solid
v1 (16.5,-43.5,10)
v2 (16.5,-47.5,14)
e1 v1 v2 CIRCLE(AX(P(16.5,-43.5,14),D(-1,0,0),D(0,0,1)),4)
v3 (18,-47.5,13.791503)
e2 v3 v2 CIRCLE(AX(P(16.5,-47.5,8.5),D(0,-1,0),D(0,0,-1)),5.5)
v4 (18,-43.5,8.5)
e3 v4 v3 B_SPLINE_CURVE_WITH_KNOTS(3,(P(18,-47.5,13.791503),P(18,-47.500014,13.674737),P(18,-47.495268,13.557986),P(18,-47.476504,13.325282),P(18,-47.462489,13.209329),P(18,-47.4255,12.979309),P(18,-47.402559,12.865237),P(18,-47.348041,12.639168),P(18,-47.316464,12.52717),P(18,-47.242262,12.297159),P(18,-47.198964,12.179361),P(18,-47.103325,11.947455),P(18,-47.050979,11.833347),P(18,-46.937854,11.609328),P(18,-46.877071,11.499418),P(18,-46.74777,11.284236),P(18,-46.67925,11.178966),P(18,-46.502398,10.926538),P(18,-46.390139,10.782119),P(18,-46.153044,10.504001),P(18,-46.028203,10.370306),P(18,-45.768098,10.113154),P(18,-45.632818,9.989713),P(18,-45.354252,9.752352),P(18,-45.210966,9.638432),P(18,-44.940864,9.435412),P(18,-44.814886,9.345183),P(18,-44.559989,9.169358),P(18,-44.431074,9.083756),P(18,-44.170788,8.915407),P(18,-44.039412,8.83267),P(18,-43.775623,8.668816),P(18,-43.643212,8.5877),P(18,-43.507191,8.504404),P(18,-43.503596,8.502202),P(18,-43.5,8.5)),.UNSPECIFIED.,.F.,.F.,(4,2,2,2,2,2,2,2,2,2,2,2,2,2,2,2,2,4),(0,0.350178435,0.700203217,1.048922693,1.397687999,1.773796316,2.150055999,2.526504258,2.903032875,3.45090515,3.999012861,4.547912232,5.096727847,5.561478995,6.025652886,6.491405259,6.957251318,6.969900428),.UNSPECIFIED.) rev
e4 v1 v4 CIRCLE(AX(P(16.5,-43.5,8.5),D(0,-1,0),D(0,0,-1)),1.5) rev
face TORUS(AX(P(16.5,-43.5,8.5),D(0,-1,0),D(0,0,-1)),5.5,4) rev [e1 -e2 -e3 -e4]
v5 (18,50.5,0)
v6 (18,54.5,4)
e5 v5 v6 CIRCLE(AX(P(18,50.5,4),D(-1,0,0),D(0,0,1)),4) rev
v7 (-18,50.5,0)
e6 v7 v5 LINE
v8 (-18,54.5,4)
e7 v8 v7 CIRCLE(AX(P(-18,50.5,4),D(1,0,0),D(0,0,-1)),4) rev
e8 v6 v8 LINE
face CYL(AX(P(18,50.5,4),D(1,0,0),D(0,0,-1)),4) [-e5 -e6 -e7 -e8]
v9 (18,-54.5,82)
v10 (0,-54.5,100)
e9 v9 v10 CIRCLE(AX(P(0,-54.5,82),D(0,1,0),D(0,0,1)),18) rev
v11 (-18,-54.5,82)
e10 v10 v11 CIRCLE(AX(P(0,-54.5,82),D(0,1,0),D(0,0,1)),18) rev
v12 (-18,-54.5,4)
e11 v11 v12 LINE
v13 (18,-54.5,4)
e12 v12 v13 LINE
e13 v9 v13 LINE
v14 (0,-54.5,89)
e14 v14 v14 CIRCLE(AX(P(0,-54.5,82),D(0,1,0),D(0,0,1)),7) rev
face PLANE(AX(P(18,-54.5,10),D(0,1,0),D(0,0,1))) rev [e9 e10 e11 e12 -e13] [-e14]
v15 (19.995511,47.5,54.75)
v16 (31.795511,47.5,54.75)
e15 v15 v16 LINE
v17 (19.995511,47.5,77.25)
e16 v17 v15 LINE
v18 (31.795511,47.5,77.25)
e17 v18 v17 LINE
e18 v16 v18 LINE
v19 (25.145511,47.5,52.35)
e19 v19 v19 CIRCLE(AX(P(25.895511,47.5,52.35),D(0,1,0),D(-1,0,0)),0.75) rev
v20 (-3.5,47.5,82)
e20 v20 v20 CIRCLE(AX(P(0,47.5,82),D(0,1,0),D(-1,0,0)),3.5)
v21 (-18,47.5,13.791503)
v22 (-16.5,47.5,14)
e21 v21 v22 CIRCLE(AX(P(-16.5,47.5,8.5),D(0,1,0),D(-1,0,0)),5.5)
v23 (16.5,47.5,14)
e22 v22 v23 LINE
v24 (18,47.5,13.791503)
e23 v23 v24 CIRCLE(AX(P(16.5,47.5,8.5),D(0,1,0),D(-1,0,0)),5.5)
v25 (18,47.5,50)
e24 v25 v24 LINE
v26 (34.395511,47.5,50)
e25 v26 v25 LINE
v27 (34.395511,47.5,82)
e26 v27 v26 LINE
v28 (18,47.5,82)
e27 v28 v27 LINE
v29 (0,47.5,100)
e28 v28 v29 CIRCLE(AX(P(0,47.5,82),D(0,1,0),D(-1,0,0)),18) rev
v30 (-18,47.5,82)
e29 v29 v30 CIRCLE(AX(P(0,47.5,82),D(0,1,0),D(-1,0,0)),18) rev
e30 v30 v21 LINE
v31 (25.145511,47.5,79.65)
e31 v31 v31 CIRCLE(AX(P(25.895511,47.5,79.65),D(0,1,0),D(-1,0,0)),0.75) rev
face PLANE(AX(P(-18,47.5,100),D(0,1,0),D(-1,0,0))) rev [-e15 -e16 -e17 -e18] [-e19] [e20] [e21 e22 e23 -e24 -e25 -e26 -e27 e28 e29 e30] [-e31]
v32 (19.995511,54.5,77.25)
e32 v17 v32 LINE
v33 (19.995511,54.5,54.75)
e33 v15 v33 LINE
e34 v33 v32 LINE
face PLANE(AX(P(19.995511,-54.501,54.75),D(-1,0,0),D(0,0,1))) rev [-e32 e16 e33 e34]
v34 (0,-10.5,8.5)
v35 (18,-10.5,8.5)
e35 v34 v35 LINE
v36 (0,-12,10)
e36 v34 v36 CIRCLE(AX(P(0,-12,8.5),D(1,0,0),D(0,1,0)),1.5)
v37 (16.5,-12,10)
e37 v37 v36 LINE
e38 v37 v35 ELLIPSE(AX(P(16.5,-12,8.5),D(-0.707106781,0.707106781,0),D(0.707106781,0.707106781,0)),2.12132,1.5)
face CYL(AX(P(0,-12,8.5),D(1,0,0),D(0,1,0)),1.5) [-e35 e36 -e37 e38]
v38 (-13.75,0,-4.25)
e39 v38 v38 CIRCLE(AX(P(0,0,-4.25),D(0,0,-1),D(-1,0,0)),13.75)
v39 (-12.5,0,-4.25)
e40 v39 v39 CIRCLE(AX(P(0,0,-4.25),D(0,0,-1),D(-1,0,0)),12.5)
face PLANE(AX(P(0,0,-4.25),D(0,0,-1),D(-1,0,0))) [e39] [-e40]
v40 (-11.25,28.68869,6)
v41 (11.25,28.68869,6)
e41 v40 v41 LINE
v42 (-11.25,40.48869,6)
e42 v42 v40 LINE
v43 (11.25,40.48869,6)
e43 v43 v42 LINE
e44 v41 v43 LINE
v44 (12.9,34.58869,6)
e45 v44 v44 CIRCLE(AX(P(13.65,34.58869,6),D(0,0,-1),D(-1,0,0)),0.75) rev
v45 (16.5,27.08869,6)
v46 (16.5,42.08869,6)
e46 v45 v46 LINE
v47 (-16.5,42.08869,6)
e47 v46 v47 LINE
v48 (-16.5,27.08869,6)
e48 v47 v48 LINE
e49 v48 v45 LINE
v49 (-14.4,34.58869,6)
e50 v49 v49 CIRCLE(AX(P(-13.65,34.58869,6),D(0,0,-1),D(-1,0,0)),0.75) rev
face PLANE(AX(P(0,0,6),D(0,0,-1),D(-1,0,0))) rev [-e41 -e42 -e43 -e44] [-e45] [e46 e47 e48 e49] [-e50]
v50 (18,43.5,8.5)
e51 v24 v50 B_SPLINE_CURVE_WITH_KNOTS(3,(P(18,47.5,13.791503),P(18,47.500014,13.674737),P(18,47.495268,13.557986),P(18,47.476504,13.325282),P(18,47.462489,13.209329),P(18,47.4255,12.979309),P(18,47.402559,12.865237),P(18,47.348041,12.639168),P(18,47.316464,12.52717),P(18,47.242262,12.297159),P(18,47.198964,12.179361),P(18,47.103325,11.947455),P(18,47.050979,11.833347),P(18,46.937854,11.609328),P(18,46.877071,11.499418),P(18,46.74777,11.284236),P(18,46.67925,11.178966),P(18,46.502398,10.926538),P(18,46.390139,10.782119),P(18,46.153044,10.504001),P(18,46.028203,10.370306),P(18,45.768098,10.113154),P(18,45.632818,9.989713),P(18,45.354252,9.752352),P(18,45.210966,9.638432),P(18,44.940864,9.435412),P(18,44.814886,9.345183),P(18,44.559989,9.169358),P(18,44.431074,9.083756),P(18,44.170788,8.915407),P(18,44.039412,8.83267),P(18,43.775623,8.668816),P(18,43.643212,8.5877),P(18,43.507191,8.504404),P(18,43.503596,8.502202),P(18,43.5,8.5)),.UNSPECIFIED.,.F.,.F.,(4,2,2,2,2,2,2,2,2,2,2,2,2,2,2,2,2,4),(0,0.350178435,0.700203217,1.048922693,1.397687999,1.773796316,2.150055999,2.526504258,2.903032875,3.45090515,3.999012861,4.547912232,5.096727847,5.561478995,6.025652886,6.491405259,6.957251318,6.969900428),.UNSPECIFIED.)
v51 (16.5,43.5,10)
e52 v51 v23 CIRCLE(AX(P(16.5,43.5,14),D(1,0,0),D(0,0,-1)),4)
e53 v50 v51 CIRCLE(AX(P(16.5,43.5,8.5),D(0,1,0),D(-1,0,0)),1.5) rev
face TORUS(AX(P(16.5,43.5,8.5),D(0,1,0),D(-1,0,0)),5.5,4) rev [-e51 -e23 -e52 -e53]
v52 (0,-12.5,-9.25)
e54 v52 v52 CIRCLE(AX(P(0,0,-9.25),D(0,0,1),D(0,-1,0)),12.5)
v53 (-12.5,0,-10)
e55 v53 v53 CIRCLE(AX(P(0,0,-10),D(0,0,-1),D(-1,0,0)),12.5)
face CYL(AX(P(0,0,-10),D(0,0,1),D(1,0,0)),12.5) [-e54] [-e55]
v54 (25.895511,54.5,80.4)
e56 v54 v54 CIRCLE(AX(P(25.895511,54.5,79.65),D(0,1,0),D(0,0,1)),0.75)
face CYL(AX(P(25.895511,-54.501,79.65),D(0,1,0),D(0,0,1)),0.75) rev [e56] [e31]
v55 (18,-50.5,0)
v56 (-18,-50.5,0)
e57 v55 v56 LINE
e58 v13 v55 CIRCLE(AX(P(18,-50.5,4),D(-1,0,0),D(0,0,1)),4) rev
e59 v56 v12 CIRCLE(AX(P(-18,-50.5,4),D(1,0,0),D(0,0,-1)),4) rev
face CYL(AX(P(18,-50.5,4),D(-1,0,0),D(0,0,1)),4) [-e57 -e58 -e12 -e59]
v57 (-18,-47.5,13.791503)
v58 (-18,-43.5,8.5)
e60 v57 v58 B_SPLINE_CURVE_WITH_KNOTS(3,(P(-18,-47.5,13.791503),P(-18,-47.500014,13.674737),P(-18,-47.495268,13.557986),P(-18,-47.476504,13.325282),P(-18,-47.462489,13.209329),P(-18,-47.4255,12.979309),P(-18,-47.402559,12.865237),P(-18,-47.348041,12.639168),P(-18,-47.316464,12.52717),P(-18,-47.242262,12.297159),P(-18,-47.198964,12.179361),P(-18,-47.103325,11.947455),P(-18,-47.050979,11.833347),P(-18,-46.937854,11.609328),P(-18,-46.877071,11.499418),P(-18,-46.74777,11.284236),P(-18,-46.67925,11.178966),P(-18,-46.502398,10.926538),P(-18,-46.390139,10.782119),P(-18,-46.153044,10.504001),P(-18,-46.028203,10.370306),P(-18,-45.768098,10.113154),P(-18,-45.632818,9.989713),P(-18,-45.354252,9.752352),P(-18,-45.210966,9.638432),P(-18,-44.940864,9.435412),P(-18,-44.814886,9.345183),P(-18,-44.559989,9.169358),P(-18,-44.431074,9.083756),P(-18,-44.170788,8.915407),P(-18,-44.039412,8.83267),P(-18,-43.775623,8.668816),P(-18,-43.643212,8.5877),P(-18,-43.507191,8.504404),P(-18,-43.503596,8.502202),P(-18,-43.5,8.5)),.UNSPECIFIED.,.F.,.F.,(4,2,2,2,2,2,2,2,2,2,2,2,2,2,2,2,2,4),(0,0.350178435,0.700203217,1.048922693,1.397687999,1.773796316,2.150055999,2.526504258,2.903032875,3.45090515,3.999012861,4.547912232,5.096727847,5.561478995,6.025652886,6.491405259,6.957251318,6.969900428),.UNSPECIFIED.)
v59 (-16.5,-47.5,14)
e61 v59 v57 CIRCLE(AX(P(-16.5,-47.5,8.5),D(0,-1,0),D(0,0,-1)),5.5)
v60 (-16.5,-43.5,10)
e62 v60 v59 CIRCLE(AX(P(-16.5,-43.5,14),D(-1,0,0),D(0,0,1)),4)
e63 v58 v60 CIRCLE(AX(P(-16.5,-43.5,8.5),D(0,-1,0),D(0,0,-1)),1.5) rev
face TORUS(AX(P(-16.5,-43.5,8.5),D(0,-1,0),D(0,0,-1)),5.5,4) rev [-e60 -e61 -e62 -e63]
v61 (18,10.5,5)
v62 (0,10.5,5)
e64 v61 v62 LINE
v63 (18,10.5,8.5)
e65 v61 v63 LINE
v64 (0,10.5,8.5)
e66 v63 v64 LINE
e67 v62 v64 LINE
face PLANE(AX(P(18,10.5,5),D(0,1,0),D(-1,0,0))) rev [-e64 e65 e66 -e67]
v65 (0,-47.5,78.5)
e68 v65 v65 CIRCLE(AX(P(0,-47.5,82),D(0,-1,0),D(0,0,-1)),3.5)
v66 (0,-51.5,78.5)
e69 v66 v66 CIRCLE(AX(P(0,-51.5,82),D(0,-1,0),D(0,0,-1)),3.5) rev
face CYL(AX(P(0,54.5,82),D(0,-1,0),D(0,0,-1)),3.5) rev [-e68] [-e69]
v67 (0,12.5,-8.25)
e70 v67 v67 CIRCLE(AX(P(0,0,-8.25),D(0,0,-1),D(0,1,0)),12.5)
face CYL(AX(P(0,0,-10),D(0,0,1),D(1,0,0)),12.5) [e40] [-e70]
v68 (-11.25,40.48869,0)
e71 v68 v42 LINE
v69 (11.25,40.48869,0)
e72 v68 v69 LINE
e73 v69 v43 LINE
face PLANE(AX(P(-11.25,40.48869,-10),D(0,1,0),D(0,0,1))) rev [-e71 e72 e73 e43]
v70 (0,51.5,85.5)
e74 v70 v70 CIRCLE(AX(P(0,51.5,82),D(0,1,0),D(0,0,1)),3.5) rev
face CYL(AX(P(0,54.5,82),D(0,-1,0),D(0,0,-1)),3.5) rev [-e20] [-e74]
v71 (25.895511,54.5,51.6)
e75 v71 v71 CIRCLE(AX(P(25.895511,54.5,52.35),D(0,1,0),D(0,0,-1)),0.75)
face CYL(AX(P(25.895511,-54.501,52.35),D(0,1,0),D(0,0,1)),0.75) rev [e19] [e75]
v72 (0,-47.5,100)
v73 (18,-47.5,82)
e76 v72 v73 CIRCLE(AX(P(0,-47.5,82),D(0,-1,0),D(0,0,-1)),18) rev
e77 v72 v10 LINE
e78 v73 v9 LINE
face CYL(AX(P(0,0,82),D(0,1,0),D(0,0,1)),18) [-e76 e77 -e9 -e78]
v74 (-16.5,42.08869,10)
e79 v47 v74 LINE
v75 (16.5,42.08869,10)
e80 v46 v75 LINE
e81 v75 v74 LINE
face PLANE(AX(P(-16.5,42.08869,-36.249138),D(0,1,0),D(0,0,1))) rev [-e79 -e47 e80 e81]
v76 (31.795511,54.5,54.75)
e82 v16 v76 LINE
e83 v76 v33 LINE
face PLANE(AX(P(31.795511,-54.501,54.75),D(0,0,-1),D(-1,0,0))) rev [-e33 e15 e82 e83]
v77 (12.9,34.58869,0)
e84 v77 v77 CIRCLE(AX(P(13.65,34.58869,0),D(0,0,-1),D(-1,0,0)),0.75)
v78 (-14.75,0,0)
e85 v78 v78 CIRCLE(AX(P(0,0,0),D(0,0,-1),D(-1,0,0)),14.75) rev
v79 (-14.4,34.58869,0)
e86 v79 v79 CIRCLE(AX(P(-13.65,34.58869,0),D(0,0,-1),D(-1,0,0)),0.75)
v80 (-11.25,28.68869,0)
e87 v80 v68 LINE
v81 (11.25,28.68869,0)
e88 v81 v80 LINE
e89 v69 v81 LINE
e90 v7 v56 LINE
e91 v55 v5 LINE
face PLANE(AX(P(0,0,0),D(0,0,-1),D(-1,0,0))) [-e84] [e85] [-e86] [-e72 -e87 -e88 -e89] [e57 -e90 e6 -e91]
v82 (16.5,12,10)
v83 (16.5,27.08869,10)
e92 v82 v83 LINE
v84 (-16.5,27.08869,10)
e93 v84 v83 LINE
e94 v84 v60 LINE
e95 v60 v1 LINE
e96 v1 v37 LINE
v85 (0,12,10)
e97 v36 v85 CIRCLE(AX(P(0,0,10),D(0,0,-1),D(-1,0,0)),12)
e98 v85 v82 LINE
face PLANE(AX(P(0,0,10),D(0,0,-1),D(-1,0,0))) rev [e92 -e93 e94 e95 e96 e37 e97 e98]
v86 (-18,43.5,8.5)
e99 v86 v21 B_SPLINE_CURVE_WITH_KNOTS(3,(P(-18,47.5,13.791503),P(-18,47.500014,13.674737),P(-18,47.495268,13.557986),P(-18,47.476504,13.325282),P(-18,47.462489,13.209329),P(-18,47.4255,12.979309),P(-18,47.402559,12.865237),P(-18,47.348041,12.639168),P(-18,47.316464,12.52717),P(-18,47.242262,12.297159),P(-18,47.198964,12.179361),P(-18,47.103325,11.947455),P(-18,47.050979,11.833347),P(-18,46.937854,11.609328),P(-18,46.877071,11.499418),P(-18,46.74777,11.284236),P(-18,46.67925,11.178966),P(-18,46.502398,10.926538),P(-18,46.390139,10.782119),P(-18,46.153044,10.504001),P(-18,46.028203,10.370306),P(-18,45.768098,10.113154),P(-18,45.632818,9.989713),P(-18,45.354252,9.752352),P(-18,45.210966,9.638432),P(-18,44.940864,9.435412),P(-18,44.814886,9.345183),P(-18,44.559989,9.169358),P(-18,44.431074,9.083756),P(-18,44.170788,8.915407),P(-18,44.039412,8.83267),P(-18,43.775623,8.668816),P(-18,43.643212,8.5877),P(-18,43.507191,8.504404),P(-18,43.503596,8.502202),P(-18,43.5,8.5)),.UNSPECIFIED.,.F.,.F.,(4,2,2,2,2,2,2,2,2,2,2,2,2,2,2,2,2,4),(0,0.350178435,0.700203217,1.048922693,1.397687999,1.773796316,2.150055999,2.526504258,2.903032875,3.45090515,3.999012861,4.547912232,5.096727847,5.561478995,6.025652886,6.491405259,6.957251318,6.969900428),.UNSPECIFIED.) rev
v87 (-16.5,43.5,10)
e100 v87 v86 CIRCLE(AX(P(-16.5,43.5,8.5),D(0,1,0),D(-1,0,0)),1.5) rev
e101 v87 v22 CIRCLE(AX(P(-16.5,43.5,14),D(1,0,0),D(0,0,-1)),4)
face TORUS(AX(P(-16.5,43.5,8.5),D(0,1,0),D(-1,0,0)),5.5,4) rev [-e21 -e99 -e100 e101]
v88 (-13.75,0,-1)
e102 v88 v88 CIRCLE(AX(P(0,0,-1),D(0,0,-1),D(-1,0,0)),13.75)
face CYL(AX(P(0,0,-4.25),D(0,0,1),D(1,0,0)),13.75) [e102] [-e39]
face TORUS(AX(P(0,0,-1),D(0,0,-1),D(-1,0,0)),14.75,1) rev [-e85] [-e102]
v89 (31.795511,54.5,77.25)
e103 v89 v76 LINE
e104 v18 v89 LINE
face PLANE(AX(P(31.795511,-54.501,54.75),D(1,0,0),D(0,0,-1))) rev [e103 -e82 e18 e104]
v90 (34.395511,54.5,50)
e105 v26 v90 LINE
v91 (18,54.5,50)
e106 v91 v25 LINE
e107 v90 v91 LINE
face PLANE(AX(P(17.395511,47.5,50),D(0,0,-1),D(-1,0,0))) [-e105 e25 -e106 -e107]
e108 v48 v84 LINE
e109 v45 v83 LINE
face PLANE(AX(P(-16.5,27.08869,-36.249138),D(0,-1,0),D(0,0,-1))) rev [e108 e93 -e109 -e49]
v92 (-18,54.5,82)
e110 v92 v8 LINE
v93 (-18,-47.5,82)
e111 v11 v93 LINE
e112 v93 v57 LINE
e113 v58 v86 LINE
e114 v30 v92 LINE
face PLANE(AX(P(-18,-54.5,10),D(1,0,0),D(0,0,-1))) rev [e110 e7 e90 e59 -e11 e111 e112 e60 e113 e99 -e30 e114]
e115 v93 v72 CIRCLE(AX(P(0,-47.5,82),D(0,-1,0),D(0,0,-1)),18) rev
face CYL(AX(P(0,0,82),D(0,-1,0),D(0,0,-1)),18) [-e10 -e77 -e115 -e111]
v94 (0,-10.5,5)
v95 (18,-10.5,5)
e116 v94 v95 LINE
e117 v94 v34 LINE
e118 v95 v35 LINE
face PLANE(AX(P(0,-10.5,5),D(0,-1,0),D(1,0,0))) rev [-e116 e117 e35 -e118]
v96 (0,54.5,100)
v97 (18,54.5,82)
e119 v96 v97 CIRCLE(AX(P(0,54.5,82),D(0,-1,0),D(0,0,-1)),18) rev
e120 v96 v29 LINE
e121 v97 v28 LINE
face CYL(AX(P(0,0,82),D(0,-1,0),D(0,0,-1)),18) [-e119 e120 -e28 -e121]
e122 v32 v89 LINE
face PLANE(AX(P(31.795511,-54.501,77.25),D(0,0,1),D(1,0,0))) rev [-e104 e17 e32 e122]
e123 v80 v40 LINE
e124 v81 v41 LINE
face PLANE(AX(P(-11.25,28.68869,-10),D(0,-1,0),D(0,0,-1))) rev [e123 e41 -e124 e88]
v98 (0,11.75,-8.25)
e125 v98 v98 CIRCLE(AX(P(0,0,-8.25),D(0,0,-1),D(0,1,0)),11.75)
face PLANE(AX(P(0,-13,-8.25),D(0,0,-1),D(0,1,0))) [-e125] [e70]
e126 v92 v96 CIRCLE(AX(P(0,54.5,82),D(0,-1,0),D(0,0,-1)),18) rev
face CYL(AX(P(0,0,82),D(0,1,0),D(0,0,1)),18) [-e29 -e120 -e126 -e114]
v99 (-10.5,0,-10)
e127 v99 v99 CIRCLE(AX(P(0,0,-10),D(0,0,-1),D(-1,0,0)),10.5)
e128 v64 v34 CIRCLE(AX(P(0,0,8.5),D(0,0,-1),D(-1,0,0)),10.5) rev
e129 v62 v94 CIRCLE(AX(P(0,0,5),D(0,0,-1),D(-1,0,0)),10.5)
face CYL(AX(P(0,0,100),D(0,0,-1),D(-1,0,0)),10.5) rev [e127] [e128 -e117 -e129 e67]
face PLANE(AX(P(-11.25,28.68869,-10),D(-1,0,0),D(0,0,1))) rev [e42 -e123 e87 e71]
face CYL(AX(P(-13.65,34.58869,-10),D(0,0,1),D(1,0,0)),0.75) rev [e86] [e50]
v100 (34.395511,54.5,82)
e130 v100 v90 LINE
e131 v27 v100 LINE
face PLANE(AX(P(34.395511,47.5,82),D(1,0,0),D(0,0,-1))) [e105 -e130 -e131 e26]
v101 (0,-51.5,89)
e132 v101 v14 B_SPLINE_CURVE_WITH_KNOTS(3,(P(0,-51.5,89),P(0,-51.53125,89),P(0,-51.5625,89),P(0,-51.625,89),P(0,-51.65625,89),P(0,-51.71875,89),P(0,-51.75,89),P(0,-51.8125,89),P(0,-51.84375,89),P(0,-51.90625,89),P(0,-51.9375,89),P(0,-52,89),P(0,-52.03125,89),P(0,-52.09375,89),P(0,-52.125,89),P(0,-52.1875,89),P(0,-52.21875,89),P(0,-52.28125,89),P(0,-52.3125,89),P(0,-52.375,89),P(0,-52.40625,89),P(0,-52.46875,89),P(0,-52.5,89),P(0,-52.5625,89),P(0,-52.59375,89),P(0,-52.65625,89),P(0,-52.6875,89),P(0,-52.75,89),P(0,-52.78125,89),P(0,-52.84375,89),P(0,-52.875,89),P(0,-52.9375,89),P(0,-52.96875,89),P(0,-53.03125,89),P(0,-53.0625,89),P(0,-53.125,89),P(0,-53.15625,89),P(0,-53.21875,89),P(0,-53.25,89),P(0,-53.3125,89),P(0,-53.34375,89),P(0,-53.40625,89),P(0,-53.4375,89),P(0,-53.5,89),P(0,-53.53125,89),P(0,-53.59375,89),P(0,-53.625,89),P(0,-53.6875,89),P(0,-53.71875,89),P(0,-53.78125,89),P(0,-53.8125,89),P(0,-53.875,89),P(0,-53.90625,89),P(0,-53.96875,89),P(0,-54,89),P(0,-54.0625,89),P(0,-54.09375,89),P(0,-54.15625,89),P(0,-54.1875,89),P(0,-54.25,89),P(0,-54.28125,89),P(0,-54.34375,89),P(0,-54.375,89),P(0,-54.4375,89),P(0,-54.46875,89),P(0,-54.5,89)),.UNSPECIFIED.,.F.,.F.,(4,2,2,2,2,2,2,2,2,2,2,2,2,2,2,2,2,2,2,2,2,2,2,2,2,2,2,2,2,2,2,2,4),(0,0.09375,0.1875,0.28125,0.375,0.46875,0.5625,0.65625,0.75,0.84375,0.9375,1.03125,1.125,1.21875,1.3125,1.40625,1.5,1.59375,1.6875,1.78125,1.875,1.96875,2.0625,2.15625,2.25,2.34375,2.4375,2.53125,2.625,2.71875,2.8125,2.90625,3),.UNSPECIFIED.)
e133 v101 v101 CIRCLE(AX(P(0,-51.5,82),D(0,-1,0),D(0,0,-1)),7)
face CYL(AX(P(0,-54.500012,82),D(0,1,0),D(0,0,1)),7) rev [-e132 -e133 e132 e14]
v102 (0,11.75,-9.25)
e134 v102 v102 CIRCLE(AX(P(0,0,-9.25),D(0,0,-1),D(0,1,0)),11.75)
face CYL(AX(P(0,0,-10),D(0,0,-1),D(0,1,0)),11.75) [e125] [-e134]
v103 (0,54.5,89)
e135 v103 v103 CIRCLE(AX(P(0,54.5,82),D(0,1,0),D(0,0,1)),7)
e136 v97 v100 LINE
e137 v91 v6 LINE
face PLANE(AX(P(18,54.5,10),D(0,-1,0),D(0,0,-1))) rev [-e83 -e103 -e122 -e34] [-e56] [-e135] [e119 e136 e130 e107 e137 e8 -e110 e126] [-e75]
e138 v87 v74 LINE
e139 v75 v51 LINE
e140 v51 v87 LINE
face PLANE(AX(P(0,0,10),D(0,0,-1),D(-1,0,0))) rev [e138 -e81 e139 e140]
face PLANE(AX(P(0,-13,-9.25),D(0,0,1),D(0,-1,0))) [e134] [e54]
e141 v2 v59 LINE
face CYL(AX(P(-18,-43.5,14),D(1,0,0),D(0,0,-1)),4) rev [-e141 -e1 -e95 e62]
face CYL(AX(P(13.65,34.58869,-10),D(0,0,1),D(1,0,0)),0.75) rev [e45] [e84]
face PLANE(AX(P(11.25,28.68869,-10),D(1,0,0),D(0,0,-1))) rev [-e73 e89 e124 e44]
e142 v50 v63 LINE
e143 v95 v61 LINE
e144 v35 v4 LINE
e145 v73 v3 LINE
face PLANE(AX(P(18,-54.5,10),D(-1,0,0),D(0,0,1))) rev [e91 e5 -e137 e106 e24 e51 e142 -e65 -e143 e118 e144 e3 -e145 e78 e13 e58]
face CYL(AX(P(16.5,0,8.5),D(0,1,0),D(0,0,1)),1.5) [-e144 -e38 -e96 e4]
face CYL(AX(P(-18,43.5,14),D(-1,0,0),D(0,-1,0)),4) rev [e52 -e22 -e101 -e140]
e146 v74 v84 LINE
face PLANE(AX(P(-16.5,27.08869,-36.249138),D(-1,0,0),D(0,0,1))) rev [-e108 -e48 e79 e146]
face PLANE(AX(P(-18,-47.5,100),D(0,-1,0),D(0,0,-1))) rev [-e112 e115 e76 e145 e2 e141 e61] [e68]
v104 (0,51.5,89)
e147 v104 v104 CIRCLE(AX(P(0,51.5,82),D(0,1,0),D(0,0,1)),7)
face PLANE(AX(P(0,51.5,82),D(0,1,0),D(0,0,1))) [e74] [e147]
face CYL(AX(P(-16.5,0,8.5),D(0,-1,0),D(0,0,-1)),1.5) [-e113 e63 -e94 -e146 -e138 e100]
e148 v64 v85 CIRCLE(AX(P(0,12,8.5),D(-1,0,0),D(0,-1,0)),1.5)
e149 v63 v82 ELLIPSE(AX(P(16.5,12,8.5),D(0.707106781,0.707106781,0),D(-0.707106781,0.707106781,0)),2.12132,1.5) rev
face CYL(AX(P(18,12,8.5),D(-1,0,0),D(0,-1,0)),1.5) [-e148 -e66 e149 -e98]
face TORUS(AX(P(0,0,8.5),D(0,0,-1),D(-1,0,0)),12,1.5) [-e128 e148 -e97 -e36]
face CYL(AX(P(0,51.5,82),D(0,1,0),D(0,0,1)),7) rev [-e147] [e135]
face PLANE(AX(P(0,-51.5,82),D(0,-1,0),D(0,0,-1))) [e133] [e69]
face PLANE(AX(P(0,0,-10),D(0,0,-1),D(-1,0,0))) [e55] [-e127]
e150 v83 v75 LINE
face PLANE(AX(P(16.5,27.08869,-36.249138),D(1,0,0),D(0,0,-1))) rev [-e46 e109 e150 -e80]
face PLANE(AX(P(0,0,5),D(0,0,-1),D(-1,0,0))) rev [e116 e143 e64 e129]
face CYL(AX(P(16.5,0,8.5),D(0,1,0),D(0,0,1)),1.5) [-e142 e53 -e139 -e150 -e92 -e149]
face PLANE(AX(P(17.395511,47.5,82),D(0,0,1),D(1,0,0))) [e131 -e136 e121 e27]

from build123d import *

# Parameters (mm, degrees)
SKETCH1_W               = 109
SKETCH1_H               = 36
BOSS_EXTRUDE1_DEPTH     = 10
SKETCH2_W               = 36
SKETCH2_H               = 7
BOSS_EXTRUDE2_DEPTH     = 90
CUT_EXTRUDE1_DEPTH      = 150.013422214
CUT_EXTRUDE1_DEPTH_BACK = 150.013422214
SKETCH3_R               = 3.5
CUT_EXTRUDE2_DEPTH      = 150.013422214
CUT_EXTRUDE2_DEPTH_BACK = 3
SKETCH4_R               = 7
CUT_EXTRUDE3_START      = -3
SKETCH5_R               = 7
CUT_EXTRUDE3_DEPTH      = 3
FILLET1_R               = 18
SKETCH6_R               = 12.5
BOSS_EXTRUDE3_DEPTH     = 10
SKETCH15_R              = 13.75
BOSS_EXTRUDE5_DEPTH     = 4.25
SKETCH7_R               = 10.5
CUT_EXTRUDE4_DEPTH      = 125.073566887
SKETCH9_R               = 0.75
SKETCH9_W               = 22.5
SKETCH9_H               = 11.8
CUT_EXTRUDE5_DEPTH      = 107.743852282
SKETCH10_W              = 33
SKETCH10_H              = 15
CUT_EXTRUDE6_DEPTH      = 4
SKETCH11_W              = 17
SKETCH11_H              = 32
BOSS_EXTRUDE4_DEPTH     = 7
CUT_EXTRUDE7_REACH      = 153.869
SKETCH12_R              = 0.75
SKETCH12_W              = 11.8
SKETCH12_H              = 22.5
CUT_EXTRUDE8_START      = -5
CUT_EXTRUDE8_DEPTH      = 5
FILLET3_R               = 1.5
FILLET4_R               = 4
SKETCH14_W              = 1.25
SKETCH14_H              = 1
FILLET5_R               = 1


# Some blends are built 0.0001 mm under size
with BuildPart() as part:
    # Sketch1 → Boss-Extrude1 (new body)
    with BuildSketch(Plane(origin=(0, 0, 0), x_dir=(0, 1, 0), z_dir=(0, 0, 1))):
        Rectangle(SKETCH1_W, SKETCH1_H)
    extrude(amount=BOSS_EXTRUDE1_DEPTH)

    # Sketch2 → Boss-Extrude2 (add)
    with BuildSketch(Plane.XY.offset(10)):
        with Locations((0, 51)):
            Rectangle(SKETCH2_W, SKETCH2_H)
        with Locations((0, -51)):
            Rectangle(SKETCH2_W, SKETCH2_H)
    extrude(amount=BOSS_EXTRUDE2_DEPTH)

    # Sketch3 → Cut-Extrude1 (cut, two sides: drawn at the far end of the back side and taken through both)
    with BuildSketch(Plane.XZ.offset(54.5).offset(-CUT_EXTRUDE1_DEPTH_BACK)):
        with Locations(Location((0, 82, 0), (0, 0, 270))):
            Circle(SKETCH3_R)
    extrude(amount=CUT_EXTRUDE1_DEPTH + CUT_EXTRUDE1_DEPTH_BACK, mode=Mode.SUBTRACT)

    # Sketch4 → Cut-Extrude2 (cut, two sides: drawn at the far end of the back side and taken through both)
    with BuildSketch(Plane.XZ.offset(54.5).offset(-CUT_EXTRUDE2_DEPTH_BACK)):
        with Locations(Location((0, 82, 0), (0, 0, 90))):
            Circle(SKETCH4_R)
    extrude(amount=CUT_EXTRUDE2_DEPTH + CUT_EXTRUDE2_DEPTH_BACK, mode=Mode.SUBTRACT)

    # Sketch5 → Cut-Extrude3 (cut)
    with BuildSketch(Plane(origin=(0, 54.5, 0), x_dir=(-1, 0, 0), z_dir=(0, 1, 0)).offset(CUT_EXTRUDE3_START)):
        with Locations(Location((0, 82, 0), (0, 0, 90))):
            Circle(SKETCH5_R)
    extrude(amount=CUT_EXTRUDE3_DEPTH, mode=Mode.SUBTRACT)

    # Fillet1
    fillet1_edges = [part.edges().sort_by_distance(p)[0] for p in [
        (18, -51, 100),
        (-18, -51, 100),
        (18, 51, 100),
        (-18, 51, 100),
    ]]
    fillet(fillet1_edges, radius=FILLET1_R - 0.0001)  # a hair under: the kernel refuses the full size

    # Sketch6 → Boss-Extrude3 (add)
    with BuildSketch(Plane(origin=(0, 0, 0), x_dir=(1, 0, 0), z_dir=(0, 0, -1))):
        with Locations(Location((0, 0, 0), (0, 0, 180))):
            Circle(SKETCH6_R)
    extrude(amount=BOSS_EXTRUDE3_DEPTH)

    # Sketch15 → Boss-Extrude5 (add)
    with BuildSketch(Plane(origin=(0, 0, 0), x_dir=(1, 0, 0), z_dir=(0, 0, -1))):
        with Locations(Location((0, 0, 0), (0, 0, 180))):
            Circle(SKETCH15_R)
    extrude(amount=BOSS_EXTRUDE5_DEPTH)

    # Sketch7 → Cut-Extrude4 (cut, through all)
    with BuildSketch(Plane(origin=(0, 0, -10), x_dir=(1, 0, 0), z_dir=(0, 0, -1))):
        with Locations(Location((0, 0, 0), (0, 0, 180))):
            Circle(SKETCH7_R)
    extrude(amount=-CUT_EXTRUDE4_DEPTH, mode=Mode.SUBTRACT)

    # Sketch9 → Cut-Extrude5 (cut, through all)
    with BuildSketch(Plane.XY.offset(10)):
        with Locations((-13.65, 34.588690348)):
            Circle(SKETCH9_R)
        with Locations((13.65, 34.588690348)):
            Circle(SKETCH9_R)
        with Locations((0, 34.588690348)):
            Rectangle(SKETCH9_W, SKETCH9_H)
    extrude(amount=-CUT_EXTRUDE5_DEPTH, mode=Mode.SUBTRACT)

    # Sketch10 → Cut-Extrude6 (cut)
    with BuildSketch(Plane.XY.offset(10)):
        with Locations((0, 34.588690348)):
            Rectangle(SKETCH10_W, SKETCH10_H)
    extrude(amount=-CUT_EXTRUDE6_DEPTH, mode=Mode.SUBTRACT)

    # Sketch11 → Boss-Extrude4 (add)
    with BuildSketch(Plane(origin=(0, 54.5, 0), x_dir=(-1, 0, 0), z_dir=(0, 1, 0))):
        with Locations((-25.895511194, 66)):
            Rectangle(SKETCH11_W, SKETCH11_H)
    extrude(amount=-BOSS_EXTRUDE4_DEPTH)

    # Sketch12 → Cut-Extrude7 (cut, up to next)
    with BuildSketch(Plane(origin=(0, 54.5, 0), x_dir=(-1, 0, 0), z_dir=(0, 1, 0)), mode=Mode.PRIVATE) as cut_extrude7_sk1:
        with Locations(Location((-25.895511194, 79.65, 0), (0, 0, 90))):
            Circle(SKETCH12_R)
    cut_extrude7_tool1 = extrude(cut_extrude7_sk1.sketch, amount=-CUT_EXTRUDE7_REACH, mode=Mode.PRIVATE) & part.part
    # Sketch12 → Cut-Extrude7 (cut, up to next)
    with BuildSketch(Plane(origin=(0, 54.5, 0), x_dir=(-1, 0, 0), z_dir=(0, 1, 0)), mode=Mode.PRIVATE) as cut_extrude7_sk2:
        with Locations((-25.895511194, 52.35)):
            Circle(SKETCH12_R)
    cut_extrude7_tool2 = extrude(cut_extrude7_sk2.sketch, amount=-CUT_EXTRUDE7_REACH, mode=Mode.PRIVATE) & part.part
    # Sketch12 → Cut-Extrude7 (cut, up to next)
    with BuildSketch(Plane(origin=(0, 54.5, 0), x_dir=(-1, 0, 0), z_dir=(0, 1, 0)), mode=Mode.PRIVATE) as cut_extrude7_sk3:
        with Locations((-25.895511194, 66)):
            Rectangle(SKETCH12_W, SKETCH12_H)
    cut_extrude7_tool3 = extrude(cut_extrude7_sk3.sketch, amount=-CUT_EXTRUDE7_REACH, mode=Mode.PRIVATE) & part.part
    add(cut_extrude7_tool1.solids().sort_by_distance((25.895511, 54.5, 79.65))[0], mode=Mode.SUBTRACT)
    add(cut_extrude7_tool2.solids().sort_by_distance((25.895511, 54.5, 52.35))[0], mode=Mode.SUBTRACT)
    add(cut_extrude7_tool3.solids().sort_by_distance((25.895511, 54.5, 66))[0], mode=Mode.SUBTRACT)

    # Sketch13 → Cut-Extrude8 (cut)
    with BuildSketch(Plane.XY.offset(10).offset(CUT_EXTRUDE8_START)):
        with BuildLine():
            Line((18, -10.5), (18, 10.5))
            Line((18, 10.5), (0, 10.5))
            ThreePointArc((0, 10.5), (10.5, 0), (0, -10.5))
            Line((0, -10.5), (18, -10.5))
        make_face()
    extrude(amount=CUT_EXTRUDE8_DEPTH, mode=Mode.SUBTRACT)

    # Fillet3
    fillet3_edges = [part.edges().sort_by_distance(p)[0] for p in [
        (-18, 0, 10),
        (18, -29, 10),
        (-7.424621202, 7.424621202, 10),
        (18, 29, 10),
        (9, -10.5, 10),
        (9, 10.5, 10),
    ]]
    fillet(fillet3_edges, radius=FILLET3_R - 0.0001)  # a hair under: the kernel refuses the full size

    # Fillet4
    # the kernel refuses this fillet: 4 mm, written as the material it adds along each edge
    with BuildSketch(Plane(origin=(16.5001, 47.5, 10), x_dir=(0, -1, 0), z_dir=(-1, 0, 0))) as fillet4_piece_1:
        with BuildLine():
            CenterArc((FILLET4_R, FILLET4_R), FILLET4_R, 180, 90)
            Line((0, FILLET4_R), (0, 0))
            Line((0, 0), (FILLET4_R, 0))
        make_face()
    extrude(amount=33.0002)
    with BuildSketch(Plane(origin=(16.5001, -47.5, 10), x_dir=(0, 1, 0), z_dir=(-1, 0, 0))) as fillet4_piece_2:
        with BuildLine():
            CenterArc((FILLET4_R, -FILLET4_R), FILLET4_R, 90, 90)
            Line((0, -FILLET4_R), (0, 0))
            Line((0, 0), (FILLET4_R, 0))
        make_face()
    extrude(amount=33.0002)
    with BuildSketch(Plane(origin=(-16.5001, -47.5, 8.5001), x_dir=(0, 0, 1), z_dir=(1, 0, 0))) as fillet4_piece_3_section:
        with BuildLine():
            CenterArc((1.4999 + FILLET4_R, -FILLET4_R), FILLET4_R, 90, 90)
            Line((1.4999 + FILLET4_R, 0), (1.4999, 0))
            Line((1.4999, 0), (1.4999, -FILLET4_R))
        make_face()
    fillet4_piece_3 = revolve(axis=Axis((-16.5001, -47.5, 8.5001), (0, -1, 0)), revolution_arc=359.64, mode=Mode.PRIVATE)
    fillet4_piece_3 = split(fillet4_piece_3, bisect_by=Plane(origin=(-18, -46.011467158, 9.644627934), z_dir=(1, 0, 0)), keep=Keep.TOP, mode=Mode.PRIVATE)
    add(fillet4_piece_3)
    with BuildSketch(Plane(origin=(-16.5001, 47.5, 8.5001), x_dir=(0, 0, 1), z_dir=(1, 0, 0))) as fillet4_piece_4_section:
        with BuildLine():
            CenterArc((1.4999 + FILLET4_R, FILLET4_R), FILLET4_R, 180, 90)
            Line((1.4999 + FILLET4_R, 0), (1.4999, 0))
            Line((1.4999, 0), (1.4999, FILLET4_R))
        make_face()
    fillet4_piece_4 = revolve(axis=Axis((-16.5001, 47.5, 8.5001), (0, -1, 0)), revolution_arc=359.64, mode=Mode.PRIVATE)
    fillet4_piece_4 = split(fillet4_piece_4, bisect_by=Plane(origin=(-18, 46.011467158, 9.644627939), z_dir=(1, 0, 0)), keep=Keep.TOP, mode=Mode.PRIVATE)
    add(fillet4_piece_4)
    with BuildSketch(Plane(origin=(16.5001, -47.5, 8.5001), x_dir=(-0.006283143965559021, 0, 0.9999802608561371), z_dir=(0.9999802608561371, 0, 0.006283143965559021))) as fillet4_piece_5_section:
        with BuildLine():
            CenterArc((-1.4999 - FILLET4_R, -FILLET4_R), FILLET4_R, 0, 90)
            Line((-1.4999 - FILLET4_R, 0), (-1.4999, 0))
            Line((-1.4999, 0), (-1.4999, -FILLET4_R))
        make_face()
    fillet4_piece_5 = revolve(axis=Axis((16.5001, -47.5, 8.5001), (0, -1, 0)), revolution_arc=359.64, mode=Mode.PRIVATE)
    fillet4_piece_5 = split(fillet4_piece_5, bisect_by=Plane(origin=(18, -46.011467161, 9.644627937), z_dir=(-1, 0, 0)), keep=Keep.TOP, mode=Mode.PRIVATE)
    add(fillet4_piece_5)
    with BuildSketch(Plane(origin=(16.5001, 47.5, 8.5001), x_dir=(-0.006283143965559021, 0, 0.9999802608561371), z_dir=(0.9999802608561371, 0, 0.006283143965559021))) as fillet4_piece_6_section:
        with BuildLine():
            CenterArc((-1.4999 - FILLET4_R, FILLET4_R), FILLET4_R, 270, 90)
            Line((-1.4999, FILLET4_R), (-1.4999, 0))
            Line((-1.4999, 0), (-1.4999 - FILLET4_R, 0))
        make_face()
    fillet4_piece_6 = revolve(axis=Axis((16.5001, 47.5, 8.5001), (0, -1, 0)), revolution_arc=359.64, mode=Mode.PRIVATE)
    fillet4_piece_6 = split(fillet4_piece_6, bisect_by=Plane(origin=(18, 46.011467202, 9.644627972), z_dir=(-1, 0, 0)), keep=Keep.TOP, mode=Mode.PRIVATE)
    add(fillet4_piece_6)
    # the kernel refuses this fillet: 4 mm, written as the material it takes off along each edge
    with BuildSketch(Plane(origin=(-28, -54.5, 0), x_dir=(0, 0, 1), z_dir=(1, 0, 0))) as fillet4_2_piece_1:
        with BuildLine():
            CenterArc((FILLET4_R, -FILLET4_R), FILLET4_R, 90, 90)
            Line((0, -FILLET4_R), (0, 0))
            Line((0, 0), (FILLET4_R, 0))
        make_face()
    extrude(amount=56, mode=Mode.SUBTRACT)
    with BuildSketch(Plane(origin=(28, 54.5, 0), x_dir=(0, -1, 0), z_dir=(-1, 0, 0))) as fillet4_2_piece_2:
        with BuildLine():
            CenterArc((FILLET4_R, FILLET4_R), FILLET4_R, 180, 90)
            Line((0, FILLET4_R), (0, 0))
            Line((0, 0), (FILLET4_R, 0))
        make_face()
    extrude(amount=56, mode=Mode.SUBTRACT)

    # Sketch14 → Cut-Revolve1 (revolve, cut)
    with BuildSketch(Plane.YZ, mode=Mode.PRIVATE) as cut_revolve1_sk:
        with Locations((-12.375, -8.75)):
            Rectangle(SKETCH14_W, SKETCH14_H)
    revolve(cut_revolve1_sk.sketch.rotate(Axis((0, 0, -10), (0, 0, 1)), 180), axis=Axis((0, 0, -10), (0, 0, 1)), mode=Mode.SUBTRACT)

    # Fillet5
    fillet5_edges = [part.edges().sort_by_distance(p)[0] for p in [
        (13.75, 0, 0),
    ]]
    fillet(fillet5_edges, radius=FILLET5_R)


solid = part.part
